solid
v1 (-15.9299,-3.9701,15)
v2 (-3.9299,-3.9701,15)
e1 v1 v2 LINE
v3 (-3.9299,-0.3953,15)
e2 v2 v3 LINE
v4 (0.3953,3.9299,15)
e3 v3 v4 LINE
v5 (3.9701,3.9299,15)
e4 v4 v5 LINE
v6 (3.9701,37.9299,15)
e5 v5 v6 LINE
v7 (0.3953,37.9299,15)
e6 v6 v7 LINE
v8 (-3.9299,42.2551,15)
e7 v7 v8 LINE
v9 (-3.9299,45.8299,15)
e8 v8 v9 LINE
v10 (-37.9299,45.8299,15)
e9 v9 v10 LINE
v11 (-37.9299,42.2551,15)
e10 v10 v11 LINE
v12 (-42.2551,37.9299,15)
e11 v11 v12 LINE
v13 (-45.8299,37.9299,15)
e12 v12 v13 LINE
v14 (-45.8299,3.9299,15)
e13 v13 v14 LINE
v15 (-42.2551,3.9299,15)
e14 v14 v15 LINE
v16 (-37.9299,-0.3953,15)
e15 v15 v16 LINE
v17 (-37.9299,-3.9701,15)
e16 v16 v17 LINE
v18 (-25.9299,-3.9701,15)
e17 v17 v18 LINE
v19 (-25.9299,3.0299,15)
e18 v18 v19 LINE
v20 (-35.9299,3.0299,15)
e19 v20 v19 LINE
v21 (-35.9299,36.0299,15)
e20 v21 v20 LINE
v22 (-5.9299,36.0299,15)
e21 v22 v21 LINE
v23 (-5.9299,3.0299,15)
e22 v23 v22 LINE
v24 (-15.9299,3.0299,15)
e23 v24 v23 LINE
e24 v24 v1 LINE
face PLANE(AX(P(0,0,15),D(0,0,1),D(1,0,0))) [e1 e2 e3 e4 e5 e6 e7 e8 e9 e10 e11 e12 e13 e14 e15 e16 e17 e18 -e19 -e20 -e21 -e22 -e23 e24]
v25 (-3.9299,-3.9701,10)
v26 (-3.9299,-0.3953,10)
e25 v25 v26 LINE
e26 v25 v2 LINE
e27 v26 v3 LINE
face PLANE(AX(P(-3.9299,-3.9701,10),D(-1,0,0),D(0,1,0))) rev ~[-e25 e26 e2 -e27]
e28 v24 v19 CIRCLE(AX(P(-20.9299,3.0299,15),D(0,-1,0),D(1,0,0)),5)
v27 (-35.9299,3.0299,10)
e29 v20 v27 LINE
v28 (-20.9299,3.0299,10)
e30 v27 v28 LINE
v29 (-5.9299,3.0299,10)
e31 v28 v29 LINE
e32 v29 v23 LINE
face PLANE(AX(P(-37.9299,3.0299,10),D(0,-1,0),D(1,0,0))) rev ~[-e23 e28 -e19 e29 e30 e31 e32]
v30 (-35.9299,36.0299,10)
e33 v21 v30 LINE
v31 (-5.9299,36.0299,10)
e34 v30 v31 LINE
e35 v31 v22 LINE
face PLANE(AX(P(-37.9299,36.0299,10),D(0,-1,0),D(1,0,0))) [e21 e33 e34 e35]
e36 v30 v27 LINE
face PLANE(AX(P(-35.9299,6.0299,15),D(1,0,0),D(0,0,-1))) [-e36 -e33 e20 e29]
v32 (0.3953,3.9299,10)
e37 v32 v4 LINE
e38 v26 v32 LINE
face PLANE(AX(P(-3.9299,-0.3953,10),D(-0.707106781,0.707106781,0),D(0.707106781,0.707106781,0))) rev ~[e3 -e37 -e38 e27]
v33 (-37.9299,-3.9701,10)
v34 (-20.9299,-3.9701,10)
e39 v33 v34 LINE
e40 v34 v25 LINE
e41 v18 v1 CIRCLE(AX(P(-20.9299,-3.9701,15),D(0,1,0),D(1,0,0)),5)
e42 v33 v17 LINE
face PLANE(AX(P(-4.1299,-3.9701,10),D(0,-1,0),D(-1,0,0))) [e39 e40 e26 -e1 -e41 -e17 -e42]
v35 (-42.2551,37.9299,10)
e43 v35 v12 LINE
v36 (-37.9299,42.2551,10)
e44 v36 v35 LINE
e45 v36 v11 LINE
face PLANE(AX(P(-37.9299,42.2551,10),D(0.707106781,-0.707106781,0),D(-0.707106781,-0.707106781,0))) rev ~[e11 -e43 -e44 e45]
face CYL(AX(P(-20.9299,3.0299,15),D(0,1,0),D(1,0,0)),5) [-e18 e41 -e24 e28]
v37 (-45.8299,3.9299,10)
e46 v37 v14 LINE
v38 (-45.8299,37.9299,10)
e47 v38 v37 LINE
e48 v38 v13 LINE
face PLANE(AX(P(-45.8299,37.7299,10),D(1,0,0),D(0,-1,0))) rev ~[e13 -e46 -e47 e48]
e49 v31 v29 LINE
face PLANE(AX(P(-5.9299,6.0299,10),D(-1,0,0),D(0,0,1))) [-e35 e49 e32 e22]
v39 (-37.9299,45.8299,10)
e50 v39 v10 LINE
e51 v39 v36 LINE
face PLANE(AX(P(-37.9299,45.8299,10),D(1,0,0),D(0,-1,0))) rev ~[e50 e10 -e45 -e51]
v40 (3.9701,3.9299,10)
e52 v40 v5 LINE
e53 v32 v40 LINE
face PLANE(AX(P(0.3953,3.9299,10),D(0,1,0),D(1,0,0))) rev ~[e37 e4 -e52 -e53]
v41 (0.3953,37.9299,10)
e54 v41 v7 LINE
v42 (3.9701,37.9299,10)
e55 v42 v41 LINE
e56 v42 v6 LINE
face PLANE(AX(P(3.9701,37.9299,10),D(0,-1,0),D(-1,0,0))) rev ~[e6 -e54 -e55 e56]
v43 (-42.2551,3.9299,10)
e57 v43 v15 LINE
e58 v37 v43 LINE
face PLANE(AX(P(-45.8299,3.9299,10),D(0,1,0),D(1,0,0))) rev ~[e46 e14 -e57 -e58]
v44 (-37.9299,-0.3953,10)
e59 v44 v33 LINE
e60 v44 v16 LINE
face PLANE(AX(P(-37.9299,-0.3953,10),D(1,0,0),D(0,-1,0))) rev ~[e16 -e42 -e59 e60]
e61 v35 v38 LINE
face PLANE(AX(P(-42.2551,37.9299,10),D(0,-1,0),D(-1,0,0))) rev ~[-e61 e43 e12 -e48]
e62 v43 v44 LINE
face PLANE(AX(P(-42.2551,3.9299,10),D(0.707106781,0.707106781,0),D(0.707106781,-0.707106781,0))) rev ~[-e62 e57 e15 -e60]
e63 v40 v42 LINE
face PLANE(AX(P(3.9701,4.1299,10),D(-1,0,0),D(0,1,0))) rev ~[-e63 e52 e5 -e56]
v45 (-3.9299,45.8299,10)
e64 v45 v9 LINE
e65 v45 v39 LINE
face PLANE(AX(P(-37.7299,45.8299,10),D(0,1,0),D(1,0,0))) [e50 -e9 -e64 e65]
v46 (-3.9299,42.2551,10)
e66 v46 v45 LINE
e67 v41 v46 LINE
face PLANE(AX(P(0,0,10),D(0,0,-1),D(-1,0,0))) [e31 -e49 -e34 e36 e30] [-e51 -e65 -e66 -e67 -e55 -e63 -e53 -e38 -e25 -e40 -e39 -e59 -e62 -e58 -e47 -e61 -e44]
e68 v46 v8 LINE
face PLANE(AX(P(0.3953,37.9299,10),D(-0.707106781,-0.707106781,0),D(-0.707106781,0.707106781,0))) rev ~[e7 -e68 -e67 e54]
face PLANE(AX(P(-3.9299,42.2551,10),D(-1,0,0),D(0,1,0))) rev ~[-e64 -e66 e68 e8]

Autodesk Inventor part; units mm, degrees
ref_plane "YZ Plane" through (0, 0, 0) normal (1, 0, 0) x (0, 1, 0)
ref_plane "XZ Plane" through (0, 0, 0) normal (0, 1, 0) x (-1, 0, 0)
ref_plane "Work Plane1" through (0, 0, 10) normal (0, 0, 1) x (1, 0, 0)
sketch "Sketch1" plane through (0, 0, 10) normal (0, 0, 1) x (1, 0, 0)
  line L0 (-4.0299, -0.3538) -> (-2.2322, 1.4439) construction
  arc A0 (-1.4439, 2.2322) -> (-2.2322, 1.4439) centre (-0.9299, 0.9299) ccw construction
  line L1 (-1.4439, 2.2322) -> (0.3538, 4.0299) construction
  line L2 (-37.8299, 42.2137) -> (-37.8299, 45.8299) construction
  line L3 (-37.8299, 45.8299) -> (-4.0299, 45.8299) construction
  line L4 (-4.0299, 45.8299) -> (-4.0299, 42.2137) construction
  line L5 (-4.0299, 4.0299) -> (0.3538, 4.0299) projected
  circle A1 centre (-20.9299, 20.9299) radius 17.5 projected
  line L6 (-20.9299, 58.9723) -> (17.1124, 20.9299) construction
  line L7 (17.1124, 20.9299) -> (-20.9299, -17.1124) construction
  line L8 (-20.9299, -17.1124) -> (-58.9723, 20.9299) construction
  line L9 (-58.9723, 20.9299) -> (-20.9299, 58.9723) construction
  line L10 (-20.9299, 58.9723) -> (-20.9299, -17.1124) construction
  line L11 (17.1124, 20.9299) -> (-58.9723, 20.9299) construction
  line L12 (-20.9299, 58.9723) -> (32.8701, 58.9723) construction
  line L13 (-43.4299, 43.4299) -> (1.5701, 43.4299) construction
  line L14 (1.5701, 43.4299) -> (1.5701, -1.5701) construction
  line L15 (1.5701, -1.5701) -> (-43.4299, -1.5701) construction
  line L16 (-43.4299, -1.5701) -> (-43.4299, 43.4299) construction
  line L17 (-43.4299, 43.4299) -> (1.5701, -1.5701) construction
  line L18 (1.5701, 43.4299) -> (-43.4299, -1.5701) construction
  line L19 (-43.4299, 5.3876) -> (-43.4299, 36.4723)
  line L20 (-43.4299, 36.4723) -> (-36.4723, 43.4299)
  line L21 (-36.4723, 43.4299) -> (-5.3876, 43.4299)
  line L22 (-5.3876, 43.4299) -> (1.5701, 36.4723)
  line L23 (1.5701, 36.4723) -> (1.5701, 5.3876)
  line L24 (1.5701, 5.3876) -> (-5.3876, -1.5701)
  line L25 (-5.3876, -1.5701) -> (-36.4723, -1.5701)
  line L26 (-36.4723, -1.5701) -> (-43.4299, 5.3876)
  line L27 (-4.0299, 42.2137) -> (-37.8299, 42.2137) projected
  line L28 (-4.0299, -0.3538) -> (-4.0299, 4.0299) projected
  circle A2 centre (-20.9299, 20.9299) radius 0.4266
  point P0 (-37.8299, 4.0299)
  dimension "d18" = 53.8
  dimension "d19" = 45
  dimension "d20" = 53.8
  dimension "d21" = 45
  dimension "d22" = 45
extrude "Extrusion1" add sketch "Sketch1" along normal blind 5 contours L28 L24 L25 L26 L19 L20 L27 L22 L23 L5 | L5 L24 L28 | L27 L20 L21 L22 | A1
sketch "Sketch3" plane through (0, 0, 10) normal (0, 0, -1) x (-1, 0, 0)
  line L0 (37.8299, -0.4701) -> (37.8299, 4.0299) construction
  line L1 (4.0299, 4.0299) -> (4.0299, -0.4701) construction
  line L2 (37.8299, -0.4701) -> (37.8299, 1.1886) construction
  line L3 (4.0299, -3.9701) -> (4.0299, -0.3538) construction
  line L4 (45.8299, 4.0299) -> (42.2137, 4.0299) construction
  line L5 (-0.3538, 4.0299) -> (-3.9701, 4.0299) construction
  line L6 (-3.9701, 37.8299) -> (-0.3538, 37.8299) construction
  line L7 (4.0299, 42.2137) -> (4.0299, 45.8299) construction
  line L8 (37.8299, 45.8299) -> (37.8299, 42.2137) construction
  line L9 (42.2137, 37.8299) -> (45.8299, 37.8299) construction
  line L10 (37.8299, 37.7299) -> (45.8299, 37.7299)
  line L11 (45.8299, 37.7299) -> (45.8299, 4.1299)
  line L12 (45.8299, 4.1299) -> (37.8299, 4.1299)
  line L13 (37.8299, 4.1299) -> (37.8299, 37.7299)
  line L14 (37.7299, 4.0299) -> (4.1299, 4.0299)
  line L15 (4.1299, 4.0299) -> (4.1299, -3.9701)
  line L16 (4.1299, -3.9701) -> (37.7299, -3.9701)
  line L17 (37.7299, -3.9701) -> (37.7299, 4.0299)
  line L18 (4.0299, 4.1299) -> (-3.9701, 4.1299)
  line L19 (-3.9701, 4.1299) -> (-3.9701, 37.7299)
  line L20 (-3.9701, 37.7299) -> (4.0299, 37.7299)
  line L21 (4.0299, 37.7299) -> (4.0299, 4.1299)
  line L22 (4.1299, 37.8299) -> (37.7299, 37.8299)
  line L23 (37.7299, 37.8299) -> (37.7299, 45.8299)
  line L24 (37.7299, 45.8299) -> (4.1299, 45.8299)
  line L25 (4.1299, 45.8299) -> (4.1299, 37.8299)
  point P0 (0, 0)
  dimension "d23" = 0.1
  dimension "d24" = 0.1
  dimension "d25" = 0.1
  dimension "d26" = 0.1
  dimension "d27" = 0.1
extrude "Extrusion3" add sketch "Sketch3" against normal up to surface (5 mm away)
sketch "Skizze12" plane through (0, 0, 10) normal (0, 0, -1) x (-1, 0, 0)
  line L0 (-0.3124, 4.1299) -> (4.1299, -0.3124) projected
  line L1 (4.1299, -0.3124) -> (4.1299, -3.9701) projected
  line L2 (4.1299, -3.9701) -> (37.7299, -3.9701) construction
  line L3 (37.7299, -3.9701) -> (37.7299, -0.3124) projected
  line L4 (37.7299, -0.3124) -> (42.1723, 4.1299) projected
  line L5 (45.8299, 4.1299) -> (42.1723, 4.1299) projected
  line L6 (45.8299, 37.7299) -> (45.8299, 4.1299) construction
  line L7 (42.1723, 37.7299) -> (45.8299, 37.7299) projected
  line L8 (42.1723, 37.7299) -> (37.7299, 42.1723) projected
  line L9 (37.7299, 42.1723) -> (37.7299, 45.8299) projected
  line L10 (37.7299, 45.8299) -> (4.1299, 45.8299) construction
  line L11 (4.1299, 45.8299) -> (4.1299, 42.1723) projected
  line L12 (4.1299, 42.1723) -> (-0.3124, 37.7299) projected
  line L13 (-3.9701, 37.7299) -> (-0.3124, 37.7299) projected
  line L14 (-3.9701, 4.1299) -> (-3.9701, 37.7299) construction
  line L15 (-0.3124, 4.1299) -> (-3.9701, 4.1299) projected
  circle A0 centre (20.9299, 20.9299) radius 0.4266 construction
  line L16 (37.9299, -4.1701) -> (3.9299, -4.1701) construction
  line L17 (3.9299, -4.1701) -> (3.9299, -0.3953)
  line L18 (3.9299, -0.3953) -> (-0.3953, 3.9299)
  line L19 (-0.3953, 3.9299) -> (-4.1701, 3.9299)
  line L20 (-4.1701, 3.9299) -> (-4.1701, 37.9299) construction
  line L21 (-4.1701, 37.9299) -> (-0.3953, 37.9299)
  line L22 (-0.3953, 37.9299) -> (3.9299, 42.2551)
  line L23 (3.9299, 42.2551) -> (3.9299, 46.0299)
  line L24 (3.9299, 46.0299) -> (37.9299, 46.0299) construction
  line L25 (37.9299, 46.0299) -> (37.9299, 42.2551)
  line L26 (37.9299, 42.2551) -> (42.2551, 37.9299)
  line L27 (42.2551, 37.9299) -> (46.0299, 37.9299)
  line L28 (46.0299, 37.9299) -> (46.0299, 3.9299) construction
  line L29 (46.0299, 3.9299) -> (42.2551, 3.9299)
  line L30 (42.2551, 3.9299) -> (37.9299, -0.3953)
  line L31 (37.9299, -0.3953) -> (37.9299, -4.1701)
  line L32 (-3.9701, 37.7299) -> (-3.9701, 37.9299)
  line L33 (37.7299, 45.8299) -> (4.1299, 45.8299) projected
  line L34 (4.1299, 45.8299) -> (3.9299, 45.8299)
  line L35 (37.7299, 45.8299) -> (37.9299, 45.8299)
  line L36 (45.8299, 37.7299) -> (45.8299, 37.9299)
  line L37 (45.8299, 4.1299) -> (45.8299, 3.9299)
  line L38 (37.7299, -3.9701) -> (37.9299, -3.9701)
  line L39 (4.1299, -3.9701) -> (3.9299, -3.9701)
  line L40 (-3.9701, 4.1299) -> (-3.9701, 3.9299)
  point P0 (0, 0)
  dimension "d65" = 0.2
extrude "IM_offset" add sketch "Skizze12" against normal up to surface (5 mm away)
ref_plane "Work Plane4" through (-37.9299, 6.0299, 10) normal (0, -1, 0) x (1, 0, 0)
sketch "Sketch17" plane through (-37.9299, 6.0299, 10) normal (0, -1, 0) x (1, 0, 0)
  line L0 (0, 5) -> (34, 5) projected
  line L1 (34, 0) -> (34, 5) projected
  line L2 (0, 0) -> (34, 0) projected
  line L3 (0, 0) -> (0, 5) projected
  line L4 (17.4266, 0) -> (16.5734, 0) projected
  line L5 (16.5734, 5) -> (17.4266, 5) projected
  line L6 (17.4266, 0) -> (16.5734, 0) projected
  line L7 (32, 5) -> (2, 5)
  line L8 (2, 5) -> (2, 0)
  line L9 (2, 0) -> (32, 0)
  line L10 (32, 0) -> (32, 5)
  line L11 (32, 5) -> (2, 0) construction
  line L12 (2, 5) -> (32, 0) construction
  point P0 (37.9299, -10)
  point P1 (17, 2.5)
  dimension "d91" = 30
extrude "Extrusion15" cut sketch "Sketch17" along normal blind 3 and the other way blind 30 contours L0 L10 L2 L8
sketch "Sketch18" plane through (-37.9299, 3.0299, 10) normal (0, -1, 0) x (1, 0, 0)
  line L0 (0, 5) -> (34, 5) projected
  line L1 (34, 0) -> (34, 5) projected
  line L2 (0, 0) -> (34, 0) projected
  line L3 (0, 0) -> (0, 5) projected
  line L4 (2, 5) -> (32, 5) projected
  circle A0 centre (17, 5) radius 5
  point P0 (37.9299, -10)
  point P1 (32, -5)
  point P2 (2, -5)
extrude "Extrusion16" add sketch "Sketch18" along normal up to surface (7 mm away) contours A0 L0 | L0 A0
properties part number "20_Cube_Insert_Despeckler_upright_motor_v3"
